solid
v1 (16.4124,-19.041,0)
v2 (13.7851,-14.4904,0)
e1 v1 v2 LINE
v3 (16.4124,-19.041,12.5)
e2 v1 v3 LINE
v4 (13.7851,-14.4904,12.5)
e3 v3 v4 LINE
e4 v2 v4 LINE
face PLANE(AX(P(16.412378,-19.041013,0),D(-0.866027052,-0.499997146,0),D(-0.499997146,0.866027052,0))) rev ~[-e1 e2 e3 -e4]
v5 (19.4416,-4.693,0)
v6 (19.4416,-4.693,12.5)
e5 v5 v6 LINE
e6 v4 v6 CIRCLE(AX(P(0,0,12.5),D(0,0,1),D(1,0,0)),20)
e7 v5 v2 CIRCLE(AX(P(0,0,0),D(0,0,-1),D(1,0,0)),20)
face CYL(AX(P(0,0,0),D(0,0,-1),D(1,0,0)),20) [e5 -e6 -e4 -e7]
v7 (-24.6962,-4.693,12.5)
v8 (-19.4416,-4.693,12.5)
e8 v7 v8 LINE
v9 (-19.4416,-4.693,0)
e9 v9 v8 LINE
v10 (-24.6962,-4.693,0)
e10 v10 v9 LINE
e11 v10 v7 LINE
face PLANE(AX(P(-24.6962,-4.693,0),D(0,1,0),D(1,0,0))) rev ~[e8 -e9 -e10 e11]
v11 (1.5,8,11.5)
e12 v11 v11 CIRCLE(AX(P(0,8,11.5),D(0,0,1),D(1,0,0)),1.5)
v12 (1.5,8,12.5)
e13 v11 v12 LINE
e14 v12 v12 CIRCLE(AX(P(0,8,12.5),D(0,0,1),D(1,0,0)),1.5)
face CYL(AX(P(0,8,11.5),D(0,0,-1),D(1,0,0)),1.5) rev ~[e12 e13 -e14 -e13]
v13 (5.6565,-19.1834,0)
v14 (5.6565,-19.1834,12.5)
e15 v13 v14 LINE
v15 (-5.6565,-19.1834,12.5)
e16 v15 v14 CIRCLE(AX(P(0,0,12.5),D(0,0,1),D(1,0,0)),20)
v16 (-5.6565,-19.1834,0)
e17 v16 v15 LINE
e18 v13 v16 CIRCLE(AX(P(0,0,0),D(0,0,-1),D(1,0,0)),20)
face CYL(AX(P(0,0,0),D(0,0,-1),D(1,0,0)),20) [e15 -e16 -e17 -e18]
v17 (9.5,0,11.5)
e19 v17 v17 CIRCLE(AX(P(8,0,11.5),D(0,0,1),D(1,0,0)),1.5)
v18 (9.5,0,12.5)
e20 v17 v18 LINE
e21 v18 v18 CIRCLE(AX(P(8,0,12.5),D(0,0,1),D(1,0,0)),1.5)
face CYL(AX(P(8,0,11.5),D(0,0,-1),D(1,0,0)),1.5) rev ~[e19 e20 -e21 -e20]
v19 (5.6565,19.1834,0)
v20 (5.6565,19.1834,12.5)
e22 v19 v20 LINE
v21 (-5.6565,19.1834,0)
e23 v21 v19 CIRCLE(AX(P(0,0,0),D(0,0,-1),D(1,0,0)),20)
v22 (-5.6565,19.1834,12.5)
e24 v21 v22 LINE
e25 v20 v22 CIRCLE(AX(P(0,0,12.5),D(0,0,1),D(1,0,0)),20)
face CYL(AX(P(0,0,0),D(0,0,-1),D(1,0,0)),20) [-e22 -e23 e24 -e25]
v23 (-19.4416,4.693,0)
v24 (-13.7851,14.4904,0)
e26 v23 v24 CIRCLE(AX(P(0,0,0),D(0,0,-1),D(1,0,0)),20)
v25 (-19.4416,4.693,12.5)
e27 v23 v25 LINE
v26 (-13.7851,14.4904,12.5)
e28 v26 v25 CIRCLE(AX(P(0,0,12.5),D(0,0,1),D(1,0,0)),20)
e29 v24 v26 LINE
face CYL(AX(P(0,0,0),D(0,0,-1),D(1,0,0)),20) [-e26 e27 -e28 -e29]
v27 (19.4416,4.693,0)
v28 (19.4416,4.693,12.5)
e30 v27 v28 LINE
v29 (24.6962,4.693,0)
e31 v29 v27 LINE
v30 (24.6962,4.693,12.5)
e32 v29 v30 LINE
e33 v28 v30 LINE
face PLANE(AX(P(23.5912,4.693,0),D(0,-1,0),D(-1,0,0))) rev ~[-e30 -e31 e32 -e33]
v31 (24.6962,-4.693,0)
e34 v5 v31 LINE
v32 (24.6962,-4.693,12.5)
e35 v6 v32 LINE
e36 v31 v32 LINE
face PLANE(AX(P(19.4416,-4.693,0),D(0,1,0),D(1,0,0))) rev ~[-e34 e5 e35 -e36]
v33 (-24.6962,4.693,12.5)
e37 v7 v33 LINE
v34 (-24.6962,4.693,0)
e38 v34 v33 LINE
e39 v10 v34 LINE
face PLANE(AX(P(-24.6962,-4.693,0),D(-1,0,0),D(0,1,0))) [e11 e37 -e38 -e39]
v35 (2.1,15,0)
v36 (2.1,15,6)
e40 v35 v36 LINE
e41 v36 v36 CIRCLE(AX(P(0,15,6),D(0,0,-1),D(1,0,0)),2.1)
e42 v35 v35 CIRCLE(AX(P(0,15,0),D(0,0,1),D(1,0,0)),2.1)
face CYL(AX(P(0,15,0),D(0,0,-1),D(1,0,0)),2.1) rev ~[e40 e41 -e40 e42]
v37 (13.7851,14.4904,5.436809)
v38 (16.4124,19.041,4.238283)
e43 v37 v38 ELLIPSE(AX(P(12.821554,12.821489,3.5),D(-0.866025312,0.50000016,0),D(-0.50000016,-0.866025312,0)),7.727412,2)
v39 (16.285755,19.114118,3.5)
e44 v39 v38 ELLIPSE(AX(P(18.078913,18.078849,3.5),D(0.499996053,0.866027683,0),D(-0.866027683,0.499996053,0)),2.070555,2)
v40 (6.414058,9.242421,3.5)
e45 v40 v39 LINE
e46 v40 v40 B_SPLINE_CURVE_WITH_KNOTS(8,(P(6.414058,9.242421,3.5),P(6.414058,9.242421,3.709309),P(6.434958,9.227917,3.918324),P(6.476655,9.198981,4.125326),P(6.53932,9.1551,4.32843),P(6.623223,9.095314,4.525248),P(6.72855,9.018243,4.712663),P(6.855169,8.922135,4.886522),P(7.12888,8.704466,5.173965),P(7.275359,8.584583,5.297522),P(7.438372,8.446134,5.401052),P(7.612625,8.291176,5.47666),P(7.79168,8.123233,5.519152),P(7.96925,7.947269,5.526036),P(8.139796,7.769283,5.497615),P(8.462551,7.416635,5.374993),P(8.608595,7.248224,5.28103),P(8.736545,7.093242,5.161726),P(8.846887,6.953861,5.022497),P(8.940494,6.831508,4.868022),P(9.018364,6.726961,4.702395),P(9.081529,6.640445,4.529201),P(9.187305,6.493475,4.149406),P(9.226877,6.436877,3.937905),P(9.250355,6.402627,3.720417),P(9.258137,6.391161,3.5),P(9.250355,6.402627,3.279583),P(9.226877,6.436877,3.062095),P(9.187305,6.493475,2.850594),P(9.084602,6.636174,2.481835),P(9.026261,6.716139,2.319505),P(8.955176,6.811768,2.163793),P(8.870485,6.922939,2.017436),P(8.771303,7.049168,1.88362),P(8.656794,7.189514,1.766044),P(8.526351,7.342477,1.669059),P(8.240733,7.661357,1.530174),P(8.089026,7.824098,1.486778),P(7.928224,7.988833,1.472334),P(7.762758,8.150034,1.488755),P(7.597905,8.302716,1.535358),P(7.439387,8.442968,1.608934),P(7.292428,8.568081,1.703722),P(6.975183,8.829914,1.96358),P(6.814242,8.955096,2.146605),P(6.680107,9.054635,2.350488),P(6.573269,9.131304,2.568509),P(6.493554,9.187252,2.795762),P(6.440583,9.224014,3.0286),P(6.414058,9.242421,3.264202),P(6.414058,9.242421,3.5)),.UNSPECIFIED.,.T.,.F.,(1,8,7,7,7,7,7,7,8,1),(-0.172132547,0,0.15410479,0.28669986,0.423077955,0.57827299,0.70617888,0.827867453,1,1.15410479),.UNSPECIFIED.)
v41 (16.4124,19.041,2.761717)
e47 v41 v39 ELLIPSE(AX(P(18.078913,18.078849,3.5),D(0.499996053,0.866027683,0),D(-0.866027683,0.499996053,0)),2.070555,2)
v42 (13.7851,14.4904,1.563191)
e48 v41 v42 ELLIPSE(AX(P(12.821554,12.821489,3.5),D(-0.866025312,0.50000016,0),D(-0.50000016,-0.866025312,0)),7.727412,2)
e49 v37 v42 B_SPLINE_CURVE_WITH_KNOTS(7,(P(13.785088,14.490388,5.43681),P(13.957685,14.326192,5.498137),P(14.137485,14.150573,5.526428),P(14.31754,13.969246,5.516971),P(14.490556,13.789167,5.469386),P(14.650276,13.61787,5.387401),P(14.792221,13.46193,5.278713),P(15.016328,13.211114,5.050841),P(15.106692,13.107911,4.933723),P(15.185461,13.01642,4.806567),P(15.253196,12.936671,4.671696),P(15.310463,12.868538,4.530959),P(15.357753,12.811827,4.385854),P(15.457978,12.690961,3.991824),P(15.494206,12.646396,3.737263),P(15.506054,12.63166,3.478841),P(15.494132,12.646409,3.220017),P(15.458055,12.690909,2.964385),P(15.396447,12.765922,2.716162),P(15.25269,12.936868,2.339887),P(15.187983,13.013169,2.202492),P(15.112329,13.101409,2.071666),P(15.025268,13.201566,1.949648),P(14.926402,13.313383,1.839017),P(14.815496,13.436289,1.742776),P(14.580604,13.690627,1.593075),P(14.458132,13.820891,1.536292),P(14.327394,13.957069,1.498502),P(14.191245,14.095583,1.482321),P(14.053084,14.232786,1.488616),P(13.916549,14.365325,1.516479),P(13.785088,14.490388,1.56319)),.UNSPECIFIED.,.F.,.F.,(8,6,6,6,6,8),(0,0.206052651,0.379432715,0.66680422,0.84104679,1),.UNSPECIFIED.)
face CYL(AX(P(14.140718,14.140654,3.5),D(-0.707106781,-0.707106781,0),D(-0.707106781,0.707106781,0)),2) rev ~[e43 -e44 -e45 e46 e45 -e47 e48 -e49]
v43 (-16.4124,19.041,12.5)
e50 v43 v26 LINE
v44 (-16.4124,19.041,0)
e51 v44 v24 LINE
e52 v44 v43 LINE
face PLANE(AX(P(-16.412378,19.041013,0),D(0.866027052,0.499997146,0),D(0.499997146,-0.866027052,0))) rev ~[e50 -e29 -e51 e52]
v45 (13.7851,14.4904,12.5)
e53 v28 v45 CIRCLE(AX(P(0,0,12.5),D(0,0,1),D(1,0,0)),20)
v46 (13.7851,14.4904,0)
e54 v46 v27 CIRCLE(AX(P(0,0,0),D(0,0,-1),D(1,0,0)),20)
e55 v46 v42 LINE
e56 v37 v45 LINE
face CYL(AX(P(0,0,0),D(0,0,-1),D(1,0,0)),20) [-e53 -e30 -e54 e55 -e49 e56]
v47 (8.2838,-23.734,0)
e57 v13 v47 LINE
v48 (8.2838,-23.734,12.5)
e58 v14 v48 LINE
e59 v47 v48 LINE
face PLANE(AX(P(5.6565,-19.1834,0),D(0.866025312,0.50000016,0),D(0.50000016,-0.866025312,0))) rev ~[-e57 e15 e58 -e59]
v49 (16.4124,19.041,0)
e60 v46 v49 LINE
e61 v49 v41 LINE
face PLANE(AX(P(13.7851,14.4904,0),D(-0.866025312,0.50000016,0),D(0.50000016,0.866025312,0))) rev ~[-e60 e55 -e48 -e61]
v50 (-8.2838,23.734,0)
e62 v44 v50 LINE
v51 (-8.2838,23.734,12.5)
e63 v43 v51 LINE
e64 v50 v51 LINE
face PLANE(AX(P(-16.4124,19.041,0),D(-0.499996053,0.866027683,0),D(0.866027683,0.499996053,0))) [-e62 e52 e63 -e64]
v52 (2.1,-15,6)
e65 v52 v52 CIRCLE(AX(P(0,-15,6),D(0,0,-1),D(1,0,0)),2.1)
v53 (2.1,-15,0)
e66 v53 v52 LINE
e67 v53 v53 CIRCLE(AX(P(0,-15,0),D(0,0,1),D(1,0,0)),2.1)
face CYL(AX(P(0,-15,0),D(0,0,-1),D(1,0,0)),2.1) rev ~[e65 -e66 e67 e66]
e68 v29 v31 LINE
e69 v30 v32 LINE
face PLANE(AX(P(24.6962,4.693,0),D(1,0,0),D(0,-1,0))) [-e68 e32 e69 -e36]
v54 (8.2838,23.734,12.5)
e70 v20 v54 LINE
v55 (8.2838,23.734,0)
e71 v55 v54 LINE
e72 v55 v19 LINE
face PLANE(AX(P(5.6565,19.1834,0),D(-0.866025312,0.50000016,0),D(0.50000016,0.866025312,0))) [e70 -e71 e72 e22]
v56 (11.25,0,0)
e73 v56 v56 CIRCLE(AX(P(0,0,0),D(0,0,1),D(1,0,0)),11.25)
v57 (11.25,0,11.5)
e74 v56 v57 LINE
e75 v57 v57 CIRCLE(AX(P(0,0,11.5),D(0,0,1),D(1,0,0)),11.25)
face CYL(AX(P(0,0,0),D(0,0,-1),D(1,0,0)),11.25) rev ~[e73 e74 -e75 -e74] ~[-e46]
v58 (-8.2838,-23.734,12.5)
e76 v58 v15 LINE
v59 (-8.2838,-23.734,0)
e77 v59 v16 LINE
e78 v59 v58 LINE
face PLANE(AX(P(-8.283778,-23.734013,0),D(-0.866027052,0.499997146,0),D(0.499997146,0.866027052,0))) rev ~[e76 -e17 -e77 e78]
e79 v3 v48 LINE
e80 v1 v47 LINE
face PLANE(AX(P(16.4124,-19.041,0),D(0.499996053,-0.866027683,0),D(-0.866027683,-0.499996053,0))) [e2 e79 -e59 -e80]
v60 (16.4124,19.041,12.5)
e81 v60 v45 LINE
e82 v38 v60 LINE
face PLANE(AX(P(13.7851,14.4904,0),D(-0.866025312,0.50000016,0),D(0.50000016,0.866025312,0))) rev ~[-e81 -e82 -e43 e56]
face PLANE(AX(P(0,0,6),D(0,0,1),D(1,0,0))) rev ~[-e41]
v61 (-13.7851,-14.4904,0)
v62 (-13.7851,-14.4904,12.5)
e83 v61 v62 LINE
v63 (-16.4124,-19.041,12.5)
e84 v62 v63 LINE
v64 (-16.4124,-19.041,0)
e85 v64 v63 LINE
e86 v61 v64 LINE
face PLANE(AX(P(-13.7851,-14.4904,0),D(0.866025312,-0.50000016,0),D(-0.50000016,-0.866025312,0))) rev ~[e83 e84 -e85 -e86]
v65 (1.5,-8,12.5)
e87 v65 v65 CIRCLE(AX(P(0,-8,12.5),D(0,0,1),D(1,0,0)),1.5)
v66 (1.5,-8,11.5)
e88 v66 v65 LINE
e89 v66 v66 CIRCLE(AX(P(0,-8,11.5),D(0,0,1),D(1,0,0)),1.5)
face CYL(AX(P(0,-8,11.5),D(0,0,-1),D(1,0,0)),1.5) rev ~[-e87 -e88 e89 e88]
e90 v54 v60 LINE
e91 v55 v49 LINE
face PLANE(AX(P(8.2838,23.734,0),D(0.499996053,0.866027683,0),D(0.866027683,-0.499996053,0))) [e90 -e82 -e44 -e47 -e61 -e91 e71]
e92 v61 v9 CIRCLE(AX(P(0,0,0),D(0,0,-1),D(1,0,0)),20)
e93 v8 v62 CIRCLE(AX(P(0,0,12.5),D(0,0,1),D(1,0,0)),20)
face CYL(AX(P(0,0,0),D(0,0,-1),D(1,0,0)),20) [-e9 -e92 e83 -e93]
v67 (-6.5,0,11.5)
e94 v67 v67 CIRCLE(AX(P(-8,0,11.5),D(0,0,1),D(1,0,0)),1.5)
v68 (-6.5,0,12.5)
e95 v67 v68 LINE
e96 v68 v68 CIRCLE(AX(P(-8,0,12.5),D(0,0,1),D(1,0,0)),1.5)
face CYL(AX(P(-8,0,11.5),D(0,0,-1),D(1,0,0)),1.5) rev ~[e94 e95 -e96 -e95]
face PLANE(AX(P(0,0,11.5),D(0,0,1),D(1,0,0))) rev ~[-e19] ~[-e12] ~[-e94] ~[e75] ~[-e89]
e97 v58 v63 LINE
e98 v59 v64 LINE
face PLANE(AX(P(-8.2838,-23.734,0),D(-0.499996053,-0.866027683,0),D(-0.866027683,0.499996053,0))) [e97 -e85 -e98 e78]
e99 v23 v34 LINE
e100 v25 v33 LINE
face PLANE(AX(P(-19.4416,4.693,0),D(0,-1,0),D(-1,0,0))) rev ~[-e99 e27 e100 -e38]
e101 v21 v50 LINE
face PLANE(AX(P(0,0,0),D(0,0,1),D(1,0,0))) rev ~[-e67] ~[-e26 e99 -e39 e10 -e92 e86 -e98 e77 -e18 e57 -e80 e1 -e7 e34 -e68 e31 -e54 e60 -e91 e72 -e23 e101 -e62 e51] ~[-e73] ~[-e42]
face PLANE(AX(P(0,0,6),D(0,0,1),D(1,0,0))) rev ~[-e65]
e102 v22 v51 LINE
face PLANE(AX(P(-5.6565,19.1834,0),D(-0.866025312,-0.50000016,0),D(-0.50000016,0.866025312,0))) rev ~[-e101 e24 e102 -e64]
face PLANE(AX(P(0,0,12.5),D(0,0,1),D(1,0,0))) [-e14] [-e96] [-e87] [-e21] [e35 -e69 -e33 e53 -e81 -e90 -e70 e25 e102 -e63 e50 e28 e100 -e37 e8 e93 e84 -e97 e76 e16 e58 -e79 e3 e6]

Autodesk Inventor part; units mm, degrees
ref_plane "YZ Plane" through (0, 0, 0) normal (1, 0, 0) x (0, 1, 0)
sketch "Эскиз1" plane through (0, 0, 0) normal (0, 0, 1) x (1, 0, 0)
  line L0 (0, 0) -> (34.5691, 5.4752) construction
  line L1 (0, 0) -> (35, 0) construction
  line L2 (0, 0) -> (34.5691, -5.4752) construction
  circle A0 centre (0, 0) radius 11.25
  circle A1 centre (0, 0) radius 15
  circle A2 centre (0, 0) radius 20
  circle A3 centre (0, 0) radius 30.0525
  circle A4 centre (0, 0) radius 32.0038
  circle A5 centre (0, 0) radius 35
  line L3 (0, 0) -> (17.5, -30.3109) construction
  circle A6 centre (0, -8) radius 1.5
  circle A7 centre (-8, 0) radius 1.5
  line L4 (0, 0) -> (-35, 0) construction
  line L5 (-29.6307, -4.693) -> (-19.4416, -4.693) construction
  line L6 (-29.6307, -4.693) -> (-19.4416, -4.693)
  line L7 (-29.6839, -4.693) -> (-29.6839, 4.693)
  line L8 (-19.4416, 4.693) -> (-34.6839, 4.693) construction
  line L9 (-19.4416, -4.693) -> (-34.6839, -4.693) construction
  line L10 (10.751, 28.0074) -> (5.6565, 19.1834) construction
  line L11 (5.6565, 19.1834) -> (13.2777, 32.3837) construction
  line L12 (-5.6565, 19.1834) -> (-13.2777, 32.3837) construction
  circle A8 centre (0, 8) radius 1.5
  line L13 (0, 0) -> (-17.5, 30.3109) construction
  line L14 (-5.6565, 19.1834) -> (-13.2777, 32.3837)
  line L15 (0, 0) -> (17.5, 30.3109) construction
  line L16 (0, 0) -> (-17.5, -30.3109) construction
  line L17 (5.6565, 19.1834) -> (13.2777, 32.3837)
  line L18 (13.3758, 26.5536) -> (16.0133, 31.1219)
  line L19 (16.3082, 24.8605) -> (18.9457, 29.4289)
  line L20 (18.9457, 29.4289) -> (17.4457, 26.8308) construction
  line L21 (29.6307, 4.693) -> (19.4416, 4.693)
  line L22 (18.8796, -23.3144) -> (13.7851, -14.4904) construction
  line L23 (13.7851, -14.4904) -> (21.4063, -27.6907) construction
  line L24 (29.6839, 4.693) -> (29.6839, 1.693)
  line L25 (29.6839, 4.693) -> (29.6839, -4.693)
  line L26 (29.6839, -4.693) -> (29.6839, -1.693) construction
  circle A9 centre (8, 0) radius 1.5
  line L27 (-18.8796, 23.3144) -> (-13.7851, 14.4904) construction
  line L28 (-13.7851, 14.4904) -> (-21.4063, 27.6907) construction
  line L29 (-18.8796, 23.3144) -> (-13.7851, 14.4904)
  line L30 (-13.7851, 14.4904) -> (-21.4063, 27.6907)
  line L31 (-18.9063, 23.3605) -> (-10.7777, 28.0536)
  line L32 (-16.3082, 24.8605) -> (-18.9457, 29.4289)
  line L33 (-13.3758, 26.5536) -> (-16.0133, 31.1219)
  line L34 (-13.7851, -14.4904) -> (-21.4063, -27.6907) construction
  line L35 (-10.751, -28.0074) -> (-5.6565, -19.1834) construction
  line L36 (-13.7851, -14.4904) -> (-21.4063, -27.6907)
  line L37 (-10.751, -28.0074) -> (-5.6565, -19.1834)
  line L38 (13.7851, 14.4904) -> (21.4063, 27.6907) construction
  line L39 (21.4063, 27.6907) -> (20.1674, 25.5449) construction
  line L40 (10.7777, 28.0536) -> (18.9063, 23.3605)
  line L41 (13.7851, 14.4904) -> (21.4063, 27.6907)
  line L42 (10.751, 28.0074) -> (5.6565, 19.1834)
  line L43 (0, 0) -> (21.2118, 27.8399) construction
  line L44 (0, 0) -> (8, 0) construction
  line L45 (0, 0) -> (0, 8) construction
  line L46 (-10.7777, -28.0536) -> (-18.9063, -23.3605)
  line L47 (-13.3758, -26.5536) -> (-16.0133, -31.1219)
  line L48 (-16.3082, -24.8605) -> (-18.9457, -29.4289)
  line L49 (-5.6565, -19.1834) -> (-13.2777, -32.3837) construction
  line L50 (5.6565, -19.1834) -> (13.2777, -32.3837) construction
  line L51 (-5.6565, -19.1834) -> (-13.2777, -32.3837)
  line L52 (18.8796, -23.3144) -> (13.7851, -14.4904)
  line L53 (5.6565, -19.1834) -> (13.2777, -32.3837)
  line L54 (16.3082, -24.8605) -> (18.9457, -29.4289)
  line L55 (13.7851, -14.4904) -> (21.4063, -27.6907)
  line L56 (13.3758, -26.5536) -> (16.0133, -31.1219)
  line L57 (18.9063, -23.3605) -> (10.7777, -28.0536)
  line L58 (27.6414, 16.1308) -> (28.831, 19.8437)
  line L59 (24.938, 20.0584) -> (28.831, 19.8437)
  line L60 (24.7499, 20.2901) -> (25.3388, 24.1443)
  line L61 (21.4607, 23.742) -> (25.3388, 24.1443)
  line L62 (17.4457, 26.8308) -> (21.2118, 27.8399)
  line L63 (21.2384, 23.9411) -> (21.2118, 27.8399)
  line L64 (-19.4416, 4.693) -> (-34.6839, 4.693)
  line L65 (-17.4453, 26.8311) -> (-21.2113, 27.8403)
  line L66 (-21.238, 23.9415) -> (-21.2113, 27.8403)
  line L67 (-21.4603, 23.7424) -> (-25.3384, 24.1447)
  line L68 (-24.7496, 20.2905) -> (-25.3384, 24.1447)
  line L69 (-24.9377, 20.0588) -> (-28.8307, 19.8442)
  line L70 (-27.6411, 16.1312) -> (-28.8307, 19.8442)
  line L71 (-27.7903, 15.8727) -> (-31.6007, 15.0465)
  line L72 (-29.8401, 11.5678) -> (-31.6007, 15.0465)
  line L73 (-29.9467, 11.289) -> (-33.5789, 9.8719)
  line L74 (-31.2916, 6.7145) -> (-33.5789, 9.8719)
  line L75 (-31.3528, 6.4224) -> (-34.716, 4.45)
  line L76 (-29.6839, -1.693) -> (-34.959, -1.693)
  line L77 (-19.4416, -4.693) -> (-34.6839, -4.693)
  line L78 (-29.6839, 1.693) -> (-34.959, 1.693)
  line L79 (-31.959, 1.693) -> (-34.716, 4.45)
  line L80 (-31.9591, -1.6925) -> (-34.716, -4.4494)
  line L81 (-31.3529, -6.4219) -> (-34.716, -4.4494)
  line L82 (-31.2917, -6.714) -> (-33.5791, -9.8714)
  line L83 (-29.9469, -11.2885) -> (-33.5791, -9.8714)
  line L84 (-29.8403, -11.5673) -> (-31.6009, -15.046)
  line L85 (-27.7906, -15.8723) -> (-31.6009, -15.046)
  line L86 (-24.938, -20.0584) -> (-28.831, -19.8437)
  line L87 (-27.6414, -16.1308) -> (-28.831, -19.8437)
  line L88 (-17.4457, -26.8308) -> (-21.2118, -27.8399)
  line L89 (-21.2384, -23.9411) -> (-21.2118, -27.8399)
  line L90 (-21.4607, -23.742) -> (-25.3388, -24.1443)
  line L91 (-24.7499, -20.2901) -> (-25.3388, -24.1443)
  line L92 (-14.5138, -28.5236) -> (-13.5047, -32.2897)
  line L93 (-10.1149, -30.3634) -> (-13.5047, -32.2897)
  line L94 (-9.8313, -30.4564) -> (-8.2407, -34.016)
  line L95 (-5.1973, -31.579) -> (-8.2407, -34.016)
  line L96 (-4.9026, -31.6261) -> (-2.7702, -34.8902)
  line L97 (-0.1495, -32.0035) -> (-2.7702, -34.8902)
  line L98 (0.149, -32.0035) -> (2.7697, -34.8902)
  line L99 (-14.5133, 28.5238) -> (-13.5042, 32.2899)
  line L100 (-10.1144, 30.3635) -> (-13.5042, 32.2899)
  line L101 (-9.8308, 30.4565) -> (-8.2401, 34.0162)
  line L102 (-5.1968, 31.5791) -> (-8.2401, 34.0162)
  line L103 (14.5138, 28.5236) -> (13.5047, 32.2897)
  line L104 (10.1149, 30.3634) -> (13.5047, 32.2897)
  line L105 (9.8313, 30.4564) -> (8.2407, 34.016)
  line L106 (5.1973, 31.579) -> (8.2407, 34.016)
  line L107 (4.9026, 31.6261) -> (2.7702, 34.8902)
  line L108 (0.1495, 32.0035) -> (2.7702, 34.8902)
  line L109 (-4.9021, 31.6262) -> (-2.7697, 34.8902)
  line L110 (-0.149, 32.0035) -> (-2.7697, 34.8902)
  line L111 (14.5133, -28.5238) -> (13.5042, -32.2899)
  line L112 (5.1968, -31.5791) -> (8.2401, -34.0162)
  line L113 (9.8308, -30.4565) -> (8.2401, -34.0162)
  line L114 (10.1144, -30.3635) -> (13.5042, -32.2899)
  line L115 (17.4453, -26.8311) -> (21.2113, -27.8403)
  line L116 (21.238, -23.9415) -> (21.2113, -27.8403)
  line L117 (4.9021, -31.6262) -> (2.7697, -34.8902)
  line L118 (19.4416, -4.693) -> (34.6839, -4.693)
  line L119 (29.6839, -1.693) -> (34.959, -1.693)
  line L120 (21.4603, -23.7424) -> (25.3384, -24.1447)
  line L121 (24.7496, -20.2905) -> (25.3384, -24.1447)
  line L122 (24.9377, -20.0588) -> (28.8307, -19.8442)
  line L123 (27.6411, -16.1312) -> (28.8307, -19.8442)
  line L124 (27.7903, -15.8727) -> (31.6007, -15.0465)
  line L125 (29.9467, -11.289) -> (33.5789, -9.8719)
  line L126 (31.2916, -6.7145) -> (33.5789, -9.8719)
  line L127 (31.3528, -6.4224) -> (34.716, -4.45)
  line L128 (31.959, -1.693) -> (34.716, -4.45)
  line L129 (29.8401, -11.5678) -> (31.6007, -15.0465)
  line L130 (34.5691, 5.4752) -> (29.6307, 4.693) construction
  line L131 (19.4416, 4.693) -> (34.6839, 4.693)
  line L132 (34.6839, 4.693) -> (29.6839, 4.693) construction
  line L133 (29.6839, 1.693) -> (34.959, 1.693)
  line L134 (29.8403, 11.5673) -> (31.6009, 15.046)
  line L135 (31.2917, 6.714) -> (33.5791, 9.8714)
  line L136 (31.9591, 1.6925) -> (34.716, 4.4494)
  line L137 (31.3529, 6.4219) -> (34.716, 4.4494)
  line L138 (29.9469, 11.2885) -> (33.5791, 9.8714)
  line L139 (27.7906, 15.8723) -> (31.6009, 15.046)
  circle A10 centre (0, 0) radius 36.5
  line L140 (0, 0) -> (-24.7487, 24.7487) construction
  line L141 (0, 0) -> (35, 0) construction
  line L142 (0, 0) -> (-24.6962, 0) construction
  line L143 (-24.6962, -4.693) -> (-24.6962, 4.693)
  line L144 (-8.2838, -23.734) -> (-16.4124, -19.041)
  line L145 (16.4124, -19.041) -> (8.2838, -23.734)
  line L146 (24.6962, 4.693) -> (24.6962, -4.693)
  line L147 (8.2838, 23.734) -> (16.4124, 19.041)
  line L148 (-16.4124, 19.041) -> (-8.2838, 23.734)
  line L149 (0, 0) -> (21.2503, 21.2503) construction
  line L150 (0, 0) -> (30.0525, 0) construction
  line L151 (14.1421, 14.1421) -> (23.5912, 4.693)
  line L152 (23.5912, 4.693) -> (-6.168, 34.4522)
  circle A11 centre (0, 15) radius 2.1
  circle A12 centre (0, -15) radius 2.1
  point P0 (0, 0)
  point P1 (18.9062, 23.3604)
  point P2 (18.9055, 23.3609)
  point P3 (10.7784, 28.0531)
  point P4 (-10.7784, 28.0531)
  point P5 (-18.9055, 23.3609)
  point P6 (-18.9062, 23.3604)
  point P7 (-29.6838, 4.693)
  point P8 (-29.6839, 4.6922)
  point P9 (-29.6839, -4.6922)
  point P10 (-18.9055, -23.3609)
  point P11 (-10.7784, -28.0531)
  point P12 (-10.7776, -28.0534)
  point P13 (10.7776, -28.0534)
  point P14 (10.7784, -28.0531)
  point P15 (18.9055, -23.3609)
  point P16 (29.6839, -4.6922)
  point P17 (29.6839, 4.6922)
  point P18 (29.6838, 4.693)
  point P19 (-29.6838, -4.693)
  point P20 (-18.9062, -23.3604)
  point P21 (18.9062, -23.3604)
  point P22 (29.6838, -4.693)
  point P23 (10.7776, 28.0534)
  point P24 (-10.7776, 28.0534)
  point P25 (-24.6962, 4.693)
  point P26 (24.6962, -4.693)
  dimension "d10" = 70
  dimension "d21" = 60.105
  dimension "d31" = 30
  dimension "d11" = 40
  dimension "d12" = 9
  dimension "d13" = 5
  dimension "d14" = 360
  dimension "d15" = 360
  dimension "d16" = 5
  dimension "d17" = 90
  dimension "d18" = 3
  dimension "d19" = 3
  dimension "d20" = 360
  dimension "d22" = 3
  dimension "d23" = 45
  dimension "d24" = 45.392
  dimension "d25" = 360
  dimension "d26" = 22.5
  dimension "d27" = 8
  dimension "d28" = 3
  dimension "d29" = 8
  dimension "d30" = 3
  dimension "d32" = 73
  dimension "d45" = 135
  dimension "d48" = 360
  dimension "d54" = 45
  dimension "d63" = 4.2
extrude "Выдавливание1" add sketch "Эскиз1" along normal blind 11.5 contours A1 A12 A11 | A11 A1 | A1 A11 | A12 A1 | A1 A12 | A2
extrude "Выдавливание4" add sketch "Эскиз1" along normal blind 1 from surface at 11.5 contours A0 | A1 A12 A11 | A11 A1 | A1 A11 | A12 A1 | A1 A12 | A2
ref_plane "РабПлоскость1" through (-24.7024, -23.7395, 10.5) normal (0, 0, 1) x (1, 0, 0)
ref_plane "РабПлоскость2" through (-24.7024, -23.7395, 9) normal (0, 0, -1) x (0, 1, 0)
extrude "Выдавливание7" add sketch "Эскиз1" along normal blind 12.5 contours A2 L21 L146 L118 | L52 L145 L53 A2 | A2 L17 L152 L41 | L152 L17 L147 L41 | L37 L144 L36 A2 | A2 L29 L148 L14 | L6 L143 L64 A2
ref_plane "РабПлоскость3" through (23.5912, 4.693, 0) normal (0.7071068, 0.7071068, 0) x (-0.7071068, 0.7071068, 0)
sketch "Эскиз2" plane through (23.5912, 4.693, 0) normal (0.7071068, 0.7071068, 0) x (-0.7071068, 0.7071068, 0)
  line L0 (13.363, 0) -> (13.363, 3.5)
  line L1 (13.8618, 0) -> (13.8618, 12.5) projected
  line L2 (13.363, 0) -> (16.863, 0) construction
  circle A0 centre (13.363, 3.5) radius 2
  dimension "d56" = 3.5
  dimension "d57" = 90
  dimension "d58" = 4
extrude "Выдавливание8" cut sketch "Эскиз2" along normal blind 5.1 and the other way blind 9
sketch "Эскиз3" plane through (0, 0, 0) normal (0, 0, -1) x (-1, 0, 0)
  point P0 (0, 0)
extrude "Выдавливание9" cut sketch "Эскиз1" along normal blind 6 contours A0 | A11 A1 | A1 A11 | A12 A1 | A1 A12 | A6 | A7 | A8 | A9
properties part number "inside_part_wheel"
